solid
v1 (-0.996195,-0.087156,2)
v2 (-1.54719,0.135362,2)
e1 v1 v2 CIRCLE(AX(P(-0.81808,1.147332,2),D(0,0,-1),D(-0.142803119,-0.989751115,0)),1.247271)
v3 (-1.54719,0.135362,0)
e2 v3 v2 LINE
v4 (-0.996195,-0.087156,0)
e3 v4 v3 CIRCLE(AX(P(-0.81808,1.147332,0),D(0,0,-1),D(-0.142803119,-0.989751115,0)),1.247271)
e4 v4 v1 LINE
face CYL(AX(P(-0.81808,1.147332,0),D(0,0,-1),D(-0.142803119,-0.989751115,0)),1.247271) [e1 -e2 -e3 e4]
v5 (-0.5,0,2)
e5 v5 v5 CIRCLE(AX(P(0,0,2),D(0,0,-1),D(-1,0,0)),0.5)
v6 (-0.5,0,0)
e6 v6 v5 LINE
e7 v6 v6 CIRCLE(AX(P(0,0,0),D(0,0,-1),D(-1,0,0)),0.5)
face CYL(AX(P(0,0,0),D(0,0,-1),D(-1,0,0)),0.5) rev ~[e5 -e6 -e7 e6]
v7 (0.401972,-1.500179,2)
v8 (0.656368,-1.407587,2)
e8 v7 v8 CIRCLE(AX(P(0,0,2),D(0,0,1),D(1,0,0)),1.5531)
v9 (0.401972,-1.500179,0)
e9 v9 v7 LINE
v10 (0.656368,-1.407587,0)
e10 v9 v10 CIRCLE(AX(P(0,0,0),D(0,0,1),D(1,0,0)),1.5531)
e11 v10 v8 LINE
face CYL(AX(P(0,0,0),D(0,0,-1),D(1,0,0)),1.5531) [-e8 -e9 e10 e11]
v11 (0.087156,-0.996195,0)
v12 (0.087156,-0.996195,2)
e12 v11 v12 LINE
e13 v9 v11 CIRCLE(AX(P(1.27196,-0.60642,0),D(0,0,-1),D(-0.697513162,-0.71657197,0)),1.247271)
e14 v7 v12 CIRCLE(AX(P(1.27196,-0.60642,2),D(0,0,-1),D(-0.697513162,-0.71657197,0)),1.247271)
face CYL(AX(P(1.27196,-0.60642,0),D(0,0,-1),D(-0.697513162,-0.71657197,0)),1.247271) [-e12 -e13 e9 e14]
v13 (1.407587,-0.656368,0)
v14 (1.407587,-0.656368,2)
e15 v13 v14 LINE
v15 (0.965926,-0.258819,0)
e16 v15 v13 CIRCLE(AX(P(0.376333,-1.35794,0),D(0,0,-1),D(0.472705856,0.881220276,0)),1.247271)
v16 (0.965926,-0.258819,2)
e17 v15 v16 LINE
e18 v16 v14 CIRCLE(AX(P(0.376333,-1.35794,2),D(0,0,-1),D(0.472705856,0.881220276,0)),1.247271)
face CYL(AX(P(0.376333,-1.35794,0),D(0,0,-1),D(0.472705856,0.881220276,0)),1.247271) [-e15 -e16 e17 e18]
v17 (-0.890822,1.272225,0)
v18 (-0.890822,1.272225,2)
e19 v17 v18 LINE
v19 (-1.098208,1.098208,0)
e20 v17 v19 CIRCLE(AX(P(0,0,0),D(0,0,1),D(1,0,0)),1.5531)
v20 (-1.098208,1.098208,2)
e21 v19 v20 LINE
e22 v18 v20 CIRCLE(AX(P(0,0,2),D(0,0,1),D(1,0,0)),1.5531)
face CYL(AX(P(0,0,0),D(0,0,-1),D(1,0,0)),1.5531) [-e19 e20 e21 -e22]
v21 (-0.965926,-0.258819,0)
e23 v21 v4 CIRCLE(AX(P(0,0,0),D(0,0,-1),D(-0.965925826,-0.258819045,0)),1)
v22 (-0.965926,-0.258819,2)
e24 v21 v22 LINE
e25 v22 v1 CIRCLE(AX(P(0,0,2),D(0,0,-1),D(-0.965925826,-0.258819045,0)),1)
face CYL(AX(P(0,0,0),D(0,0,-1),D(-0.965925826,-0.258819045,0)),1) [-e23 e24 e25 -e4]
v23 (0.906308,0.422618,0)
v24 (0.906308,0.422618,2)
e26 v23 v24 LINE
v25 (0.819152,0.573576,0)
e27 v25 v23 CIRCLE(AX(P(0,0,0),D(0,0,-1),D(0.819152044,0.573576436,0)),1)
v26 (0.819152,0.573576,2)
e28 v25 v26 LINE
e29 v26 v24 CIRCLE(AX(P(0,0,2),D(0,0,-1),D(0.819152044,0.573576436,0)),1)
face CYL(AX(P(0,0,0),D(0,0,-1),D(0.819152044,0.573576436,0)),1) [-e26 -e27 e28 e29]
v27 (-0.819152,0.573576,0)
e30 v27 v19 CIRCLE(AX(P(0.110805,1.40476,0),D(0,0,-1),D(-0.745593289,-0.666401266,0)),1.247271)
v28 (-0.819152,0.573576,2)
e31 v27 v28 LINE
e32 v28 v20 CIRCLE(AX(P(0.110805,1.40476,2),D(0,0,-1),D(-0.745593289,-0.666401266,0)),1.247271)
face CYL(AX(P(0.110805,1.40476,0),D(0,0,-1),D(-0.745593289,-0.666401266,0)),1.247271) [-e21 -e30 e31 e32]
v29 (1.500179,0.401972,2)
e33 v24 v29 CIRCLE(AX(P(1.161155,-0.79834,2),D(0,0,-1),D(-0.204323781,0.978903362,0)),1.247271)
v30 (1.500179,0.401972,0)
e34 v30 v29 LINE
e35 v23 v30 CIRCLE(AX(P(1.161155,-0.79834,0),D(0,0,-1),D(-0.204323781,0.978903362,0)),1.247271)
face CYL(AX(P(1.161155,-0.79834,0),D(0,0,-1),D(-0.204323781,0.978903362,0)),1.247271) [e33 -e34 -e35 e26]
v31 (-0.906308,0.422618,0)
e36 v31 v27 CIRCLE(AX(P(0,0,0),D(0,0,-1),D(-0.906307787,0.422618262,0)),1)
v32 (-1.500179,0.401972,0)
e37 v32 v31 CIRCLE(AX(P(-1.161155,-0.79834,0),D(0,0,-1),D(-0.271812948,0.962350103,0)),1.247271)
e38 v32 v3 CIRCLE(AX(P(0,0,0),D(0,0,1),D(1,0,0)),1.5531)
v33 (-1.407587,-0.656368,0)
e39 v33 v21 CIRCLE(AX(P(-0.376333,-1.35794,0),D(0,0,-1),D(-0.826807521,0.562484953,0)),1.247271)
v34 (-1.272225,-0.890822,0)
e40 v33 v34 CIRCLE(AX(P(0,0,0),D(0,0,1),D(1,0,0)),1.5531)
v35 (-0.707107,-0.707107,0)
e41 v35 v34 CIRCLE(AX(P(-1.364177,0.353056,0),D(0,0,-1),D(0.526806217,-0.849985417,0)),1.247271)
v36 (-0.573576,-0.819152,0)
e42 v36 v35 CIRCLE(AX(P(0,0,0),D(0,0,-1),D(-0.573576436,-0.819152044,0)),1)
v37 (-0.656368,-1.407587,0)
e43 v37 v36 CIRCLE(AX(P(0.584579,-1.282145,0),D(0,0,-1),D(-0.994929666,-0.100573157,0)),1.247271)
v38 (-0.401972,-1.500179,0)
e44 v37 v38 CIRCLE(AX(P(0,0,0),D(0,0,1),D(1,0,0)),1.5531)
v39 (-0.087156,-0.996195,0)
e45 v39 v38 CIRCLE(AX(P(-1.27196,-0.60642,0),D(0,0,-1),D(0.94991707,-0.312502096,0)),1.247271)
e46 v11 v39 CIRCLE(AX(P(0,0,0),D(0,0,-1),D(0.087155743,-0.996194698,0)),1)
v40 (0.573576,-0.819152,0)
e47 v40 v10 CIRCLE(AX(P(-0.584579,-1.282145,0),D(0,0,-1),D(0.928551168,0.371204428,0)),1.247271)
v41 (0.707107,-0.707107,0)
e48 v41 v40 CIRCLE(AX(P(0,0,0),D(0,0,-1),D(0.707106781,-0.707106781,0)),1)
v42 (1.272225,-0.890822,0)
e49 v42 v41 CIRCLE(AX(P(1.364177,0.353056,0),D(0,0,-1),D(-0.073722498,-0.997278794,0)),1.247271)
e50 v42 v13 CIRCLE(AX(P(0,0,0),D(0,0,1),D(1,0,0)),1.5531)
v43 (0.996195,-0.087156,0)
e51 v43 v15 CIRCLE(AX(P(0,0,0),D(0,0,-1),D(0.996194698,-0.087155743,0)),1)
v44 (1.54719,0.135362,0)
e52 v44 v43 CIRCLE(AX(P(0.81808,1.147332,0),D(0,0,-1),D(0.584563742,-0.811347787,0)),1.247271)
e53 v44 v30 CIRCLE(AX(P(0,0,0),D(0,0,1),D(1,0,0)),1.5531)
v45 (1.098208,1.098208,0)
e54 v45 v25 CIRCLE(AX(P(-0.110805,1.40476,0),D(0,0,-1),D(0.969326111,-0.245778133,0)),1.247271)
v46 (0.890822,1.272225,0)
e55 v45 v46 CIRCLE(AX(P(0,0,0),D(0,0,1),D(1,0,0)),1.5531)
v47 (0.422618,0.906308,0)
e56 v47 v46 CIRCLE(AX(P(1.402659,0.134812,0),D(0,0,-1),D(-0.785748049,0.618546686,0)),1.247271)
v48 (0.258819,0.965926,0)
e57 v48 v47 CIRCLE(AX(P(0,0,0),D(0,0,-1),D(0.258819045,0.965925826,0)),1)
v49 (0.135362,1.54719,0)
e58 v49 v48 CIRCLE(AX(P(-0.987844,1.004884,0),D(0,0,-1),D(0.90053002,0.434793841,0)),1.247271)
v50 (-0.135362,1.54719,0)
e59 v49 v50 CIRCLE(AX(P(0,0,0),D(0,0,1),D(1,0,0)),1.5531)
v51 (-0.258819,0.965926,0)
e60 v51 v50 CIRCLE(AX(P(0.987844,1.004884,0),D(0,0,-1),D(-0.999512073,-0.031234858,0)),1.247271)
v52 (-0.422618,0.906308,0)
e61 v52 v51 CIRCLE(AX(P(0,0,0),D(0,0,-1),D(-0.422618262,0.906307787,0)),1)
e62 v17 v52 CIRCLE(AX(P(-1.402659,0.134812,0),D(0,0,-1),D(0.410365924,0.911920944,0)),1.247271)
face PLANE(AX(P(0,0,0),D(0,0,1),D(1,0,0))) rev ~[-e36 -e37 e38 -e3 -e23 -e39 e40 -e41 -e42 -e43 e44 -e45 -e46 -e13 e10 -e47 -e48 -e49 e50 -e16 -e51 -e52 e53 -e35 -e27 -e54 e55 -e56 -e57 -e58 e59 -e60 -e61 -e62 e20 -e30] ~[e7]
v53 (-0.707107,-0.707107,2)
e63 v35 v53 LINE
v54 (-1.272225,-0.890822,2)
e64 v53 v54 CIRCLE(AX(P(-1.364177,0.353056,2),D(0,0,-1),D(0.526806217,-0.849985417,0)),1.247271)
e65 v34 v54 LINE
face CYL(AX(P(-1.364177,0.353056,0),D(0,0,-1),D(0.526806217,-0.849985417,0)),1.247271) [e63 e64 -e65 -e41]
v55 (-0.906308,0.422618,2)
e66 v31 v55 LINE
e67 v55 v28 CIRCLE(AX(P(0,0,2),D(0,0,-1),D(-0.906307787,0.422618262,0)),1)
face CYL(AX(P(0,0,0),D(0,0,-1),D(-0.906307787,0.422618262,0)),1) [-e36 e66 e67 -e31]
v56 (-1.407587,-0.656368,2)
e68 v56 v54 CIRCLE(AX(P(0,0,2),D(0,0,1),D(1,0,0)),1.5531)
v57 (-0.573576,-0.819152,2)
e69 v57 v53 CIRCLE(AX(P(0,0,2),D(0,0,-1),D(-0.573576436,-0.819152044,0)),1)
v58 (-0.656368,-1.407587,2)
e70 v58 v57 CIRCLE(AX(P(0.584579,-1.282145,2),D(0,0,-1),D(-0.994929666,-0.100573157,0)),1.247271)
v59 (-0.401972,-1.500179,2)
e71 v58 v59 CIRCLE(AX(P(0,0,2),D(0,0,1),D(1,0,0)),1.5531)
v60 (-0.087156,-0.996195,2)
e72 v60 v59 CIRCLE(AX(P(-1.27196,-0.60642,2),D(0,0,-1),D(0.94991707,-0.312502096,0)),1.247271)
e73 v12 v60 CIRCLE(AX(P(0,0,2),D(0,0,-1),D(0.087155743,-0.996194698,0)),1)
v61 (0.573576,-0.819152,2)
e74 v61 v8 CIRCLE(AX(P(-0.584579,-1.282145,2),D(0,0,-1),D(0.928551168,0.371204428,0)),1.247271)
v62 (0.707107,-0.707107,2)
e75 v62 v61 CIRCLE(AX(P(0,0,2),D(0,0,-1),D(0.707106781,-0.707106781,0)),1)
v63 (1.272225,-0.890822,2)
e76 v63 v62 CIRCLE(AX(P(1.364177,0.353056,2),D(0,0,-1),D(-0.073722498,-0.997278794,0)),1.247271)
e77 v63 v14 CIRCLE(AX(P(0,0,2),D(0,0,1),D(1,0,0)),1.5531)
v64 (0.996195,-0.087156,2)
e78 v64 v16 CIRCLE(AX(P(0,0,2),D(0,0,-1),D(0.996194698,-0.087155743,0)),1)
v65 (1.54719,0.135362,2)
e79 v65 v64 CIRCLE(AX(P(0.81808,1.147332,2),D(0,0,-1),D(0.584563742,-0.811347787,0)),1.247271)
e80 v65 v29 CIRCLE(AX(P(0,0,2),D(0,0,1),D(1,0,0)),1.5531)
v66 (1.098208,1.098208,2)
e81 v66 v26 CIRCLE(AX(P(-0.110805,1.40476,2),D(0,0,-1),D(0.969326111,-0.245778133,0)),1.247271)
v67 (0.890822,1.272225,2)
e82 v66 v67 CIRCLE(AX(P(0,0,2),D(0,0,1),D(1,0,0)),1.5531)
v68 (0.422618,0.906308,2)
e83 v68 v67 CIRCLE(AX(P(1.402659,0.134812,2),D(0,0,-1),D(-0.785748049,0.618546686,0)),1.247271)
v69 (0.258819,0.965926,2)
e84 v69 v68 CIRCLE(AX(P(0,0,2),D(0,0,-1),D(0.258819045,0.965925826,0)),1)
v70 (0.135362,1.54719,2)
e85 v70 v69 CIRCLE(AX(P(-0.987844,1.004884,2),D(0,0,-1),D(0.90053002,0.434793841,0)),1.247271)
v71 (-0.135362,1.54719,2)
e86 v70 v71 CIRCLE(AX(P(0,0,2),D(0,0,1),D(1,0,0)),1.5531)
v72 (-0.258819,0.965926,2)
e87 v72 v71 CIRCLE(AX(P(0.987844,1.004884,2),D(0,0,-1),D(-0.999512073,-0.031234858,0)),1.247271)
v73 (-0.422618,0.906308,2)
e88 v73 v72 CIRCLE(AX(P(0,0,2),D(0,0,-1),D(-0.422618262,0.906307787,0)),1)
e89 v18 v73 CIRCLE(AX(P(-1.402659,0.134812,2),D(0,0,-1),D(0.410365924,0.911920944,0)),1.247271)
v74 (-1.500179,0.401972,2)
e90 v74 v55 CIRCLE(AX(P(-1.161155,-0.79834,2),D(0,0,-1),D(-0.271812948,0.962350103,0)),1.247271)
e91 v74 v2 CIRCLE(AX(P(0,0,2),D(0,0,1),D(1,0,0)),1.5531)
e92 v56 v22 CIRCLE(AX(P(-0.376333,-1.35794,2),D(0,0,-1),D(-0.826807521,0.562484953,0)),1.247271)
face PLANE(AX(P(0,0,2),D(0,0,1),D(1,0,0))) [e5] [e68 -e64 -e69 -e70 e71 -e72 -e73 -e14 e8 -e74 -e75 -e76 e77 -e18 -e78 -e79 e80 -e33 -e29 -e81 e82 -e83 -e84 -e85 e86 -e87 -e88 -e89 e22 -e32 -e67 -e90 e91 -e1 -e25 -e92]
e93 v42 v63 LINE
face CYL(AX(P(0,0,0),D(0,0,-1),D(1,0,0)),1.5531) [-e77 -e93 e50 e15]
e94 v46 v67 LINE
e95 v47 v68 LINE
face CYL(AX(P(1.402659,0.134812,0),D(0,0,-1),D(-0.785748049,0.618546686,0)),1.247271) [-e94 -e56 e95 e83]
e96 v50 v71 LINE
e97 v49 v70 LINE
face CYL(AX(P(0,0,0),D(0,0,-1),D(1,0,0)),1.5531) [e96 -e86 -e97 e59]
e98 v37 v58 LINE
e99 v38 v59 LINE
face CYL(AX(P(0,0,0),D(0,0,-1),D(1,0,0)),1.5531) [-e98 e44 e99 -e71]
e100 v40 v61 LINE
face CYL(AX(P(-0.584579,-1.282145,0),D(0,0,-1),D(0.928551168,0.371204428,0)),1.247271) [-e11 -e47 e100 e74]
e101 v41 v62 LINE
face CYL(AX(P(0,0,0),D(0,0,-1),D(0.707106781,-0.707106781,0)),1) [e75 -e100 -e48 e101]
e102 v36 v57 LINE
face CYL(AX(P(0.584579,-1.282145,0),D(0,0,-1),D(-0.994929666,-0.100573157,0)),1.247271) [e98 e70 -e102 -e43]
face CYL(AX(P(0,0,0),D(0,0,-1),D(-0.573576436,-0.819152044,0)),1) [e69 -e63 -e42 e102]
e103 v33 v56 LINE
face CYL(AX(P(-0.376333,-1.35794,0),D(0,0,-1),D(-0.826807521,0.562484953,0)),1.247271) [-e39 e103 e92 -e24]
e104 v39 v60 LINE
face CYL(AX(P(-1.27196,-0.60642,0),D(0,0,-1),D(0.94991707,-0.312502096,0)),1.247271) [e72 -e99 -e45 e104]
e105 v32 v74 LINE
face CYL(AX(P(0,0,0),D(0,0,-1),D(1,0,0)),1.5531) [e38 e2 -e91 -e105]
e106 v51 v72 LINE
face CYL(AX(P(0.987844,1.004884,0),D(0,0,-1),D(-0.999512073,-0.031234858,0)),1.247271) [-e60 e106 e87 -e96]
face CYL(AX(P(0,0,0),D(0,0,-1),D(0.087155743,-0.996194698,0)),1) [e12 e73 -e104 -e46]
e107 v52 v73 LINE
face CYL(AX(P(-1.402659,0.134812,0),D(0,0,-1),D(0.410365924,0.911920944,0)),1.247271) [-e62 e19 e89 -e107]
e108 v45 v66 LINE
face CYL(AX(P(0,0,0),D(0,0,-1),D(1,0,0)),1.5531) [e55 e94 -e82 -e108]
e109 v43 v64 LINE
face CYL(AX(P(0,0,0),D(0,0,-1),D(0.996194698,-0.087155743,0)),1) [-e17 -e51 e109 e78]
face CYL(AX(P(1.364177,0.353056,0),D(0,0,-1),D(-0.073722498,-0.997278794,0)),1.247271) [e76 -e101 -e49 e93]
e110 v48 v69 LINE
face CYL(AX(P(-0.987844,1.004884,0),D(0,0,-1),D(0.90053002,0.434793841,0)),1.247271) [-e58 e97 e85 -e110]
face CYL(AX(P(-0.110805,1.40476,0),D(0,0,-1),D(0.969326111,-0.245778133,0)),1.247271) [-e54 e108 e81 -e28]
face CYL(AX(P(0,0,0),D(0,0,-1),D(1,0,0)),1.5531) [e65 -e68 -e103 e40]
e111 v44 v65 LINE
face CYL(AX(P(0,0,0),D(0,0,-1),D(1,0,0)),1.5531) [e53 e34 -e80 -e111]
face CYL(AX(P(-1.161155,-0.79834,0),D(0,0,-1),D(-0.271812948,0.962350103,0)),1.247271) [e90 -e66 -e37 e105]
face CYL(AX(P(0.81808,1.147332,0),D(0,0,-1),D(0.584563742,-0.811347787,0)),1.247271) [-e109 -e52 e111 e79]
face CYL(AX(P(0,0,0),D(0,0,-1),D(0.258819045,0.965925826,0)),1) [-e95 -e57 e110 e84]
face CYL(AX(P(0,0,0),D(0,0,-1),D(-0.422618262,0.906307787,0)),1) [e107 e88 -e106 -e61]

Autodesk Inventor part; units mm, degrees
sketch "Sketch1" plane through (0, 0, 0) normal (0, 0, 1) x (1, 0, 0)
  circle A0 centre (0, 0) radius 1.5531
  dimension "d0" = 3.1061
extrude "Extrusion1" add sketch "Sketch1" along normal blind 2
ref_plane "Work Plane2" through (0, 0, 1) normal (0, 0, 1) x (1, 0, 0)
sketch "Sketch2" plane through (0, 0, 0) normal (0, 0, -1) x (-1, 0, 0)
  circle A0 centre (0, 0) radius 1.5531 projected
  circle A1 centre (0, 0) radius 1.3795
  dimension "d3" = 2.759
surface extrude "Pitch Diameter" sketch "Sketch2" against normal through all shown no curves A1
ref_plane "Work Plane8" through (0, 0, 0) normal (0.9396926, 0.3420201, 0) x (0, 0, 1)
ref_plane "Work Plane9" through (0, 0, 0) normal (1, 0, 0) x (0, 1, 0)
spur gear teeth "Spur Gear" teeth 9 pitch diameter 2.8125 tip diameter 3.1062 root diameter 2 face width 2 start plane through (0, 0, 0) normal (0, 0, -1) x (-1, 0, 0)
sketch "Sketch3" plane through (0, 0, 0) normal (0, 0, -1) x (-1, 0, 0)
  circle A0 centre (0, 0) radius 0.5
  dimension "d49" = 1
extrude "Extrusion2" cut sketch "Sketch3" against normal through all
equation "\"d0\" = da_da"
equation "\"d1\" = da_b"
equation "\"d3\" = da_dw"
equation "\"d16\" = da_aw"
equation "\"d43\" = da_aw"
equation "\"d46\" = da_aw"
equation "\"da_da\" = 3.106154"
equation "\"da_b\" = 2"
equation "\"da_dw\" = 2.758973"
equation "\"da_aw\" = 6.284327"
properties part number "Spur Gear1" material "Steel"
